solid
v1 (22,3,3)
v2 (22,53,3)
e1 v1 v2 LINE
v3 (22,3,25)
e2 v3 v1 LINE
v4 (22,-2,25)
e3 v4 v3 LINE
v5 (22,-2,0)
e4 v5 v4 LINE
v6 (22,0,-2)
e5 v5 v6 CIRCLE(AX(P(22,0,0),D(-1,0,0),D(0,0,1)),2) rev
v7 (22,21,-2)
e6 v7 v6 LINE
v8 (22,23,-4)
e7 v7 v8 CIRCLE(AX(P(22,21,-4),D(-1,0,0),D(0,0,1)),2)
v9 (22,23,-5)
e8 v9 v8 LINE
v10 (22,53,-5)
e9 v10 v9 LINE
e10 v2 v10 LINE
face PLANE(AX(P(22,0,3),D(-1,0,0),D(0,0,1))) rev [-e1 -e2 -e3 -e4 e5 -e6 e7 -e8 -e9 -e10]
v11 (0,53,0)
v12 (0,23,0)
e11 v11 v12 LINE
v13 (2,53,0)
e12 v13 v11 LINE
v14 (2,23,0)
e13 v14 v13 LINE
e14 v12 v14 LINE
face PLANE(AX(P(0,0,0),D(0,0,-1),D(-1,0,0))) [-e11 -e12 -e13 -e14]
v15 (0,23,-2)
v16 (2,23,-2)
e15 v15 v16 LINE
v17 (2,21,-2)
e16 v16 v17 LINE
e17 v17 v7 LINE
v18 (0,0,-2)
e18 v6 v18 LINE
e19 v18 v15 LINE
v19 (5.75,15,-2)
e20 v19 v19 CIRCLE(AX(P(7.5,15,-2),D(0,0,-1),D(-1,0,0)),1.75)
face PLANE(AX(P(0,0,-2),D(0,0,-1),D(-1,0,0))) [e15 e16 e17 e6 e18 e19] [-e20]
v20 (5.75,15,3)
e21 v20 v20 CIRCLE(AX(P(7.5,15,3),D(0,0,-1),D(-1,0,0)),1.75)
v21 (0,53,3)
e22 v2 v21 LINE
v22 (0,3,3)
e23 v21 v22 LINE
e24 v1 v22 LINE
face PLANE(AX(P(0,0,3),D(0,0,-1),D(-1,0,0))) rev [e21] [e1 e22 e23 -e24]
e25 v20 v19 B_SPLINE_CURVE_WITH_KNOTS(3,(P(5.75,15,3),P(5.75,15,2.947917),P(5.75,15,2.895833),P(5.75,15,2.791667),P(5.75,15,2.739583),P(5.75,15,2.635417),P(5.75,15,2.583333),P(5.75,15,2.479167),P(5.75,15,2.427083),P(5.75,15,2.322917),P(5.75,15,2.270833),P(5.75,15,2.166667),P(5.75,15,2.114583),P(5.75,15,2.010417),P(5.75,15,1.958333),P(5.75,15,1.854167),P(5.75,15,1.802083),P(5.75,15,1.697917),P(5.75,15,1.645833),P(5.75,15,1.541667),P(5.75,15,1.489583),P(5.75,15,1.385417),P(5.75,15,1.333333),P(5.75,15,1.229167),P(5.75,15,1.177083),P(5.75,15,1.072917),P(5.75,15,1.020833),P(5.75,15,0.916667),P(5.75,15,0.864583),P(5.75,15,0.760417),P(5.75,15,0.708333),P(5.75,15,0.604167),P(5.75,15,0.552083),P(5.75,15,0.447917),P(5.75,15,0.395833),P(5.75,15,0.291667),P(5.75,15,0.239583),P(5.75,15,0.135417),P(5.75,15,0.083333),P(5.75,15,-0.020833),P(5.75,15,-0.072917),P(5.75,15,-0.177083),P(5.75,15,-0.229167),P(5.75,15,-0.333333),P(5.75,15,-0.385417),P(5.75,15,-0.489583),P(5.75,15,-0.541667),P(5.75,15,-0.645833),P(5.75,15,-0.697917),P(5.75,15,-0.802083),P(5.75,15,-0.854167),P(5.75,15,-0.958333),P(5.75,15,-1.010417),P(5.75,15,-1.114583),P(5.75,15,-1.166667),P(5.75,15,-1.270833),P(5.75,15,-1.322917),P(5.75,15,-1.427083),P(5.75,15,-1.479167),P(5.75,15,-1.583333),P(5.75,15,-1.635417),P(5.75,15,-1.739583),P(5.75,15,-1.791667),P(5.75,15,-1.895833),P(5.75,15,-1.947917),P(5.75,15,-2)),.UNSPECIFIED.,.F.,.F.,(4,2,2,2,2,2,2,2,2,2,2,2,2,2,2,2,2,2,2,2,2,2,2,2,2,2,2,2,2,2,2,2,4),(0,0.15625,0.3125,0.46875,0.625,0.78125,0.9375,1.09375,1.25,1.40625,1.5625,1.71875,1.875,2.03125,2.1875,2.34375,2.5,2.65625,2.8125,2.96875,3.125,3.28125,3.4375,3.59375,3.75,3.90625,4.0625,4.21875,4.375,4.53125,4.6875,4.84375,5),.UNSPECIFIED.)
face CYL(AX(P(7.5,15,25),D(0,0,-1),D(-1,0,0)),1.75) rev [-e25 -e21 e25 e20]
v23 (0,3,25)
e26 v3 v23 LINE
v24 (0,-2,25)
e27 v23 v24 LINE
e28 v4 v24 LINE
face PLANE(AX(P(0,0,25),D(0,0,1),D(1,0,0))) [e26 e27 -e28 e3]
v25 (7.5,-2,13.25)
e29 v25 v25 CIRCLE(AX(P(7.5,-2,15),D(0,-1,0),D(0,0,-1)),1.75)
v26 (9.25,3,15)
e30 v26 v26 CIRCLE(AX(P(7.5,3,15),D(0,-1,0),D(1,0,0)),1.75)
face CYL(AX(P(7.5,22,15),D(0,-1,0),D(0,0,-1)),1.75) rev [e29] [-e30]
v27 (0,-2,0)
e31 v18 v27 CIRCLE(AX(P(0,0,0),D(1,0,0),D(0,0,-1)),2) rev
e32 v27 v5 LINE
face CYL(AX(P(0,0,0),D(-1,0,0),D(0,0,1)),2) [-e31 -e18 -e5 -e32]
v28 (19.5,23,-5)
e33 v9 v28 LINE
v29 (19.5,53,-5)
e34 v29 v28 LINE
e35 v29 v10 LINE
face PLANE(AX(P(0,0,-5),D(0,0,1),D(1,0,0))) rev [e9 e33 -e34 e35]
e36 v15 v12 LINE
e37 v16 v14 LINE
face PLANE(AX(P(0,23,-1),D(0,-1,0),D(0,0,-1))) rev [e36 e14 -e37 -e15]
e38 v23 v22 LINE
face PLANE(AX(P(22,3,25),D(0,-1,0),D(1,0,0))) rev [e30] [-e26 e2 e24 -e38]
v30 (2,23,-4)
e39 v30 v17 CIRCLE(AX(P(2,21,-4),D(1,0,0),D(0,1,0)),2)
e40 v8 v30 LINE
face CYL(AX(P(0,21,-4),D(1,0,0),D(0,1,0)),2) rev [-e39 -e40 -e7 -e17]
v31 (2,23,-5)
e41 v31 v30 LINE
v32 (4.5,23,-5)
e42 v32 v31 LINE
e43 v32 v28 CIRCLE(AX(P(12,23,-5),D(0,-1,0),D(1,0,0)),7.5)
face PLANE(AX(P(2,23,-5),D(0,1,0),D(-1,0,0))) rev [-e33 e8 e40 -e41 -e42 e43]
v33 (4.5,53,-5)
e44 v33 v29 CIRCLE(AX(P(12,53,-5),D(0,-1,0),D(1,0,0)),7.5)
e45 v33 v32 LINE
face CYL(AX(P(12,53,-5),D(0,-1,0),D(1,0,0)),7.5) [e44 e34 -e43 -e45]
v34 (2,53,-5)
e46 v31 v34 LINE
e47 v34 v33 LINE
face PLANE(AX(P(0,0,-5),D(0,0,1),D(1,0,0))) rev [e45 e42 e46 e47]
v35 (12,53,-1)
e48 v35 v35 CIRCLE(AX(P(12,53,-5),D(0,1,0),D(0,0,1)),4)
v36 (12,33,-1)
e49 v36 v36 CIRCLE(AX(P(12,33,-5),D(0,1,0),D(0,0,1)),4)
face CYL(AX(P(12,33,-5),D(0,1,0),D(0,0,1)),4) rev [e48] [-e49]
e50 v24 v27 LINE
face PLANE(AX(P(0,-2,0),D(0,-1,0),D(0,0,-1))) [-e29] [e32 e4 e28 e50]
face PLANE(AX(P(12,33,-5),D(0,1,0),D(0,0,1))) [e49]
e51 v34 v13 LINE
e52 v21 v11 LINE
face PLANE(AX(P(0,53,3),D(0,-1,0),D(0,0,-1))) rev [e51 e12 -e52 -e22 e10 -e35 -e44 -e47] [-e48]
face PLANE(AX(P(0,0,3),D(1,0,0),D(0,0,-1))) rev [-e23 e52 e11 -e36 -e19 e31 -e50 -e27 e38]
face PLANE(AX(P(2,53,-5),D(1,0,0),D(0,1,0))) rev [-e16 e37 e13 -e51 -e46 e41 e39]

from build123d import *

# Parameters (mm, degrees)
SKETCH1_W           = 22
SKETCH1_H           = 53
BOSS_EXTRUDE1_DEPTH = 3
SKETCH2_W           = 22
SKETCH2_H           = 3
BOSS_EXTRUDE2_DEPTH = 22
SKETCH3_R           = 1.75
CUT_EXTRUDE1_DEPTH  = 22
SKETCH4_R           = 1.75
CUT_EXTRUDE2_DEPTH  = 63.593929418
SKETCH5_W           = 20
SKETCH5_H           = 30
BOSS_EXTRUDE3_DEPTH = 5
BOSS_EXTRUDE4_DEPTH = 30
SKETCH7_R           = 4
CUT_EXTRUDE3_DEPTH  = 20
BOSS_EXTRUDE5_START = 1
SKETCH8_W           = 22
SKETCH8_H           = 23
SKETCH8_R           = 1.75
BOSS_EXTRUDE5_DEPTH = 1
BOSS_EXTRUDE6_START = 1
SKETCH9_W           = 22
SKETCH9_H           = 26
SKETCH9_R           = 1.75
BOSS_EXTRUDE6_DEPTH = 1
BOSS_EXTRUDE7_START = 1
SKETCH10_W          = 22
SKETCH10_H          = 26
SKETCH10_R          = 1.75
BOSS_EXTRUDE7_DEPTH = 1
BOSS_EXTRUDE8_START = 1
SKETCH11_W          = 22
SKETCH11_H          = 25
SKETCH11_R          = 1.75
BOSS_EXTRUDE8_DEPTH = 1
FILLET1_R           = 2
FILLET2_R           = 2


with BuildPart() as part:
    # Sketch1 → Boss-Extrude1 (new body)
    with BuildSketch(Plane.XY):
        with Locations((11, 26.5)):
            Rectangle(SKETCH1_W, SKETCH1_H)
    extrude(amount=BOSS_EXTRUDE1_DEPTH)

    # Sketch2 → Boss-Extrude2 (add)
    with BuildSketch(Plane.XY.offset(3)):
        with Locations((11, 1.5)):
            Rectangle(SKETCH2_W, SKETCH2_H)
    extrude(amount=BOSS_EXTRUDE2_DEPTH)

    # Sketch3 → Cut-Extrude1 (cut)
    with BuildSketch(Plane.XZ):
        with Locations(Location((7.5, 15, 0), (0, 0, 270))):
            Circle(SKETCH3_R)
    extrude(amount=-CUT_EXTRUDE1_DEPTH, mode=Mode.SUBTRACT)

    # Sketch4 → Cut-Extrude2 (cut, through all)
    with BuildSketch(Plane(origin=(0, 0, 0), x_dir=(-1, 0, 0), z_dir=(0, 0, -1))):
        with Locations((-7.5, 15)):
            Circle(SKETCH4_R)
    extrude(amount=-CUT_EXTRUDE2_DEPTH, mode=Mode.SUBTRACT)

    # Sketch5 → Boss-Extrude3 (add)
    with BuildSketch(Plane(origin=(0, 0, 0), x_dir=(-1, 0, 0), z_dir=(0, 0, -1))):
        with Locations((-12, 38)):
            Rectangle(SKETCH5_W, SKETCH5_H)
    extrude(amount=BOSS_EXTRUDE3_DEPTH)

    # Sketch6 → Boss-Extrude4 (add)
    with BuildSketch(Plane.XZ.offset(-23)):
        with BuildLine():
            Line((19.5, -5), (4.5, -5))
            ThreePointArc((4.5, -5), (12, -12.5), (19.5, -5))
        make_face()
    extrude(amount=-BOSS_EXTRUDE4_DEPTH)

    # Sketch7 → Cut-Extrude3 (cut)
    with BuildSketch(Plane(origin=(0, 53, 0), x_dir=(1, 0, 0), z_dir=(0, 1, 0))):
        with Locations(Location((12, 5, 0), (0, 0, 270))):
            Circle(SKETCH7_R)
    extrude(amount=-CUT_EXTRUDE3_DEPTH, mode=Mode.SUBTRACT)

    # Sketch8 → Boss-Extrude5 (add)
    with BuildSketch(Plane(origin=(0, 0, 0), x_dir=(-1, 0, 0), z_dir=(0, 0, -1)).offset(BOSS_EXTRUDE5_START)):
        with Locations((-11, 11.5)):
            Rectangle(SKETCH8_W, SKETCH8_H)
        with Locations((-7.5, 15)):
            Circle(SKETCH8_R, mode=Mode.SUBTRACT)
    extrude(amount=-BOSS_EXTRUDE5_DEPTH)

    # Sketch9 → Boss-Extrude6 (add)
    with BuildSketch(Plane.XZ.offset(BOSS_EXTRUDE6_START)):
        with Locations((11, 12)):
            Rectangle(SKETCH9_W, SKETCH9_H)
        with Locations(Location((7.5, 15, 0), (0, 0, 270))):
            Circle(SKETCH9_R, mode=Mode.SUBTRACT)
    extrude(amount=-BOSS_EXTRUDE6_DEPTH)

    # Sketch10 → Boss-Extrude7 (add)
    with BuildSketch(Plane(origin=(0, -1, 0), x_dir=(-1, 0, 0), z_dir=(0, -1, 0)).offset(BOSS_EXTRUDE7_START)):
        with Locations((-11, -12)):
            Rectangle(SKETCH10_W, SKETCH10_H)
        with Locations(Location((-7.5, -15, 0), (0, 0, 90))):
            Circle(SKETCH10_R, mode=Mode.SUBTRACT)
    extrude(amount=-BOSS_EXTRUDE7_DEPTH)

    # Sketch11 → Boss-Extrude8 (add)
    with BuildSketch(Plane(origin=(0, 0, -1), x_dir=(-1, 0, 0), z_dir=(0, 0, -1)).offset(BOSS_EXTRUDE8_START)):
        with Locations((-11, 10.5)):
            Rectangle(SKETCH11_W, SKETCH11_H)
        with Locations((-7.5, 15)):
            Circle(SKETCH11_R, mode=Mode.SUBTRACT)
    extrude(amount=-BOSS_EXTRUDE8_DEPTH)

    # Fillet1
    fillet1_edges = [part.edges().sort_by_distance(p)[0] for p in [
        (11, -2, -2),
    ]]
    fillet(fillet1_edges, radius=FILLET1_R)

    # Fillet2
    fillet2_edges = [part.edges().sort_by_distance(p)[0] for p in [
        (12, 23, -2),
    ]]
    fillet(fillet2_edges, radius=FILLET2_R)


solid = part.part
